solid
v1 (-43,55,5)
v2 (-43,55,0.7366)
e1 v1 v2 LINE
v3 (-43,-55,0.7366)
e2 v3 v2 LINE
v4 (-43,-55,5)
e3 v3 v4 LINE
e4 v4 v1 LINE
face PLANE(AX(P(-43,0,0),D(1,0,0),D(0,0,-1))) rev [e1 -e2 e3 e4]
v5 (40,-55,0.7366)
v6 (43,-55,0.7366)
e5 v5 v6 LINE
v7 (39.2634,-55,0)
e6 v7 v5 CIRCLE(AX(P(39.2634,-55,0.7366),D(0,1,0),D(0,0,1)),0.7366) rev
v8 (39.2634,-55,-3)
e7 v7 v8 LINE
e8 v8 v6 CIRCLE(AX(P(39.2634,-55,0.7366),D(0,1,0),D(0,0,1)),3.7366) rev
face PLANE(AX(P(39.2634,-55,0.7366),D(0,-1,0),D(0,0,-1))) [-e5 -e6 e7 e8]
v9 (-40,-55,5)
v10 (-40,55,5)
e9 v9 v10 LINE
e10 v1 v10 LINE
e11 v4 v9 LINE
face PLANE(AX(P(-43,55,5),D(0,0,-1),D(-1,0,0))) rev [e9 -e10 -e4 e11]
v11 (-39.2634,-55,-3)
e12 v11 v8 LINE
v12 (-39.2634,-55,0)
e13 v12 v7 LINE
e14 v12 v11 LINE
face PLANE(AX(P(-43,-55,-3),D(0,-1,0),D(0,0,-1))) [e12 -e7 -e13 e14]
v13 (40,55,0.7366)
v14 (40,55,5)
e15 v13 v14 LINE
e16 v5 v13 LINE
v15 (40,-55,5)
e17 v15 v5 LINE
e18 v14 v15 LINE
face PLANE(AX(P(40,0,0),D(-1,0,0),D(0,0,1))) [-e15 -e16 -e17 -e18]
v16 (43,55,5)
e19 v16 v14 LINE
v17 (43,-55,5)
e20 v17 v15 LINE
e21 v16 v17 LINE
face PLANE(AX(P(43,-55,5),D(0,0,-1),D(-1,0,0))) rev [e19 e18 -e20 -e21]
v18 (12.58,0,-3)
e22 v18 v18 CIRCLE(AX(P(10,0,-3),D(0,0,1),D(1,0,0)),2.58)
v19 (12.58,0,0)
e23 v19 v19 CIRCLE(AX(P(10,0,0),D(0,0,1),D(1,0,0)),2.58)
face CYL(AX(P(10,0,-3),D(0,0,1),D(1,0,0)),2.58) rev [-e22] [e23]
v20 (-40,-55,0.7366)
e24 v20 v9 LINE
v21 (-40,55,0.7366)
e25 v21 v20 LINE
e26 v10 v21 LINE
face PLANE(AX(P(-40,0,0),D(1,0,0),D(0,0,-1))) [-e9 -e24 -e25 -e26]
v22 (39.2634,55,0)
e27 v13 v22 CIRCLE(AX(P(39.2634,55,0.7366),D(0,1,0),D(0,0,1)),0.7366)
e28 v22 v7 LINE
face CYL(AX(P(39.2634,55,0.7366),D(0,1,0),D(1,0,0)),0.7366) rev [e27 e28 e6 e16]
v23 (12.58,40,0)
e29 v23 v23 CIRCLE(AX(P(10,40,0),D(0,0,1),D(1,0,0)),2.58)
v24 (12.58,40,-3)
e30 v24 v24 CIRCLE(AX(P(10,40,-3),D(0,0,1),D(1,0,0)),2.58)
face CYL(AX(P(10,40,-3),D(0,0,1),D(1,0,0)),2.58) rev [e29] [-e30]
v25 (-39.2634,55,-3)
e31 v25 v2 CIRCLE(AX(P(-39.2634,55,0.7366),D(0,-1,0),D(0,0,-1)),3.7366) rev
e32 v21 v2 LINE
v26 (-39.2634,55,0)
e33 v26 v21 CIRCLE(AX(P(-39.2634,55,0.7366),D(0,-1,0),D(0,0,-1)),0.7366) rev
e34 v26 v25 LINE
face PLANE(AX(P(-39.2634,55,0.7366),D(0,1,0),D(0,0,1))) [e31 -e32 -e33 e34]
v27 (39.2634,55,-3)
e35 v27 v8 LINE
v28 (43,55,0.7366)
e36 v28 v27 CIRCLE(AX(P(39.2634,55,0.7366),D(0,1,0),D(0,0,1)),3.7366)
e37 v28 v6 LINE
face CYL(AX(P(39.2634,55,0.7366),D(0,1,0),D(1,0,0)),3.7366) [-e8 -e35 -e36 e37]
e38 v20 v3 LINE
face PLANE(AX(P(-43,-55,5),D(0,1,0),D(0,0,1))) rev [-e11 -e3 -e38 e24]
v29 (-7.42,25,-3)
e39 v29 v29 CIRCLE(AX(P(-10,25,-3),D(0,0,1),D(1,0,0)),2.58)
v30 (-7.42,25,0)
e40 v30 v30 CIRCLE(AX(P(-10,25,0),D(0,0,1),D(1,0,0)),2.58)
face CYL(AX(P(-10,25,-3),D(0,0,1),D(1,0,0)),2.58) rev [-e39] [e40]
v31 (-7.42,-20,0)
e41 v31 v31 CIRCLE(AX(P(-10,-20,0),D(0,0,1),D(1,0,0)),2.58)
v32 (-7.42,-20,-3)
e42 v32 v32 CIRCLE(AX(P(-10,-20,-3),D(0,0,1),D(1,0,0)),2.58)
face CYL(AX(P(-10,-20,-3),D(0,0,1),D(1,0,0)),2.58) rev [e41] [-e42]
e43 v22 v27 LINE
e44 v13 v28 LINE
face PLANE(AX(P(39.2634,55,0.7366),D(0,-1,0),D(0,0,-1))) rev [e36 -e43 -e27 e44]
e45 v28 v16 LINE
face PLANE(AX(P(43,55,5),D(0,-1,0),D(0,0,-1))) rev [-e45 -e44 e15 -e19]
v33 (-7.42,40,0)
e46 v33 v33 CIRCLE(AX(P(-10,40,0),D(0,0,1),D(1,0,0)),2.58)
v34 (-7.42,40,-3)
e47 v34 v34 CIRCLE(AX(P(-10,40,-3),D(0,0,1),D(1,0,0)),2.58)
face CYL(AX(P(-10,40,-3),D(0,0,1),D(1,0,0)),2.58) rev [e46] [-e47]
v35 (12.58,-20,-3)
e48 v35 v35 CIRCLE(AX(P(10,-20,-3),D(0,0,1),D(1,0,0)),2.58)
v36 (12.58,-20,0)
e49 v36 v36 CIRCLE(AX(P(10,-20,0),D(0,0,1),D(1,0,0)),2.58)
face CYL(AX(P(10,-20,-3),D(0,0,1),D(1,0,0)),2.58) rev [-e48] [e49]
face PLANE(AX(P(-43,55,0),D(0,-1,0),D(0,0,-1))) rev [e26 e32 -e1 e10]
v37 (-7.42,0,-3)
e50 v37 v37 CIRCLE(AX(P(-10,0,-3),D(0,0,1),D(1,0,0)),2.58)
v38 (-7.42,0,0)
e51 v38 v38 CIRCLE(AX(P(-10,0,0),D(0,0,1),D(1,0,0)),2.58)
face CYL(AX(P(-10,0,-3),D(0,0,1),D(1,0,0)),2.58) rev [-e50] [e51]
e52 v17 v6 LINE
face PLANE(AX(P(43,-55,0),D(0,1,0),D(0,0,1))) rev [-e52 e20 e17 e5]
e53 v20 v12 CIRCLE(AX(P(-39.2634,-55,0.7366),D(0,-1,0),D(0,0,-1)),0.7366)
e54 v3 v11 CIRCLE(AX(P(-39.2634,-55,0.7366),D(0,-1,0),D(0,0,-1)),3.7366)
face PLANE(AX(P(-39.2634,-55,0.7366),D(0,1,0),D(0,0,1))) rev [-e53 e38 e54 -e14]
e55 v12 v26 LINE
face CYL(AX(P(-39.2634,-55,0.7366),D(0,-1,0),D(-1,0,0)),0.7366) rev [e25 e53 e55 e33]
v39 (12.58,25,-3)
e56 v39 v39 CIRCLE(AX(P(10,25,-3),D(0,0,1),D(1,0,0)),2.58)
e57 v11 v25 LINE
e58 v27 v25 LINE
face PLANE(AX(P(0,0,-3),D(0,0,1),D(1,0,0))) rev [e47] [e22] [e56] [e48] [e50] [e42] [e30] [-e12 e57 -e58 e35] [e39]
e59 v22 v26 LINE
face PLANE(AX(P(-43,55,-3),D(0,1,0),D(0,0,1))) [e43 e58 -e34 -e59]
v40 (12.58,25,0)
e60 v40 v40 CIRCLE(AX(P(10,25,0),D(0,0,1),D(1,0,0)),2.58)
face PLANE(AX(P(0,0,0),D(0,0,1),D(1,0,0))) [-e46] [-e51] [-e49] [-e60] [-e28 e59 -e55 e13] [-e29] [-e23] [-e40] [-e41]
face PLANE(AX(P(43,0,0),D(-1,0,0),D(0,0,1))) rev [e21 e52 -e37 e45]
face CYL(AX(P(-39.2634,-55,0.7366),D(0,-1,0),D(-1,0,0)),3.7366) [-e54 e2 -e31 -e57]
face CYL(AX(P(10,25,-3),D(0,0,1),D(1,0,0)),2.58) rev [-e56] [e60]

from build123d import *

# Parameters (mm, degrees)
SKETCH1_W                      = 86
SKETCH1_H                      = 110
BASE_FLANGE1_DEPTH             = 3
SKETCH6_R                      = 2.58
CUT_EXTRUDE1_DEPTH             = 3
EDGE_FLANGE1_STRIP_W           = 13.4732
EDGE_FLANGE1_STRIP_H           = 3
EDGE_FLANGE1_STRIP_CUT_DEPTH   = 110
EDGE_FLANGE1_STRIP_2_W         = 13.4732
EDGE_FLANGE1_STRIP_2_H         = 3
EDGE_FLANGE1_STRIP_CUT_2_DEPTH = 110
EDGE_FLANGE1_DEPTH             = 110
EDGE_FLANGE1_BEND_DEPTH        = 110


# Sheet-metal steps are written as plain solids
with BuildPart() as part:
    # Sketch1 → Base-Flange1 (new body)
    with BuildSketch(Plane.XY):
        Rectangle(SKETCH1_W, SKETCH1_H)
    extrude(amount=-BASE_FLANGE1_DEPTH)

    # Sketch6 → Cut-Extrude1 (cut)
    with BuildSketch(Plane.XY):
        with Locations((-10, 40)):
            Circle(SKETCH6_R)
        with Locations((10, 40)):
            Circle(SKETCH6_R)
        with Locations((-10, 25)):
            Circle(SKETCH6_R)
        with Locations((10, 25)):
            Circle(SKETCH6_R)
        with Locations((10, 0)):
            Circle(SKETCH6_R)
        with Locations((-10, 0)):
            Circle(SKETCH6_R)
        with Locations((-10, -20)):
            Circle(SKETCH6_R)
        with Locations((10, -20)):
            Circle(SKETCH6_R)
    extrude(amount=-CUT_EXTRUDE1_DEPTH, mode=Mode.SUBTRACT)

    # Edge-Flange1 strip (across the edge) → Edge-Flange1 strip cut (cut)
    with BuildSketch(Plane(origin=(-43, 55, 0), x_dir=(1, 0, 0), z_dir=(0, -1, 0))):
        with Locations((-3, -1.5)):
            Rectangle(EDGE_FLANGE1_STRIP_W, EDGE_FLANGE1_STRIP_H)
    extrude(amount=EDGE_FLANGE1_STRIP_CUT_DEPTH, mode=Mode.SUBTRACT)

    # Edge-Flange1 strip 2 (across the edge) → Edge-Flange1 strip cut 2 (cut)
    with BuildSketch(Plane(origin=(43, -55, 0), x_dir=(-1, 0, 0), z_dir=(0, 1, 0))):
        with Locations((-3, -1.5)):
            Rectangle(EDGE_FLANGE1_STRIP_2_W, EDGE_FLANGE1_STRIP_2_H)
    extrude(amount=EDGE_FLANGE1_STRIP_CUT_2_DEPTH, mode=Mode.SUBTRACT)

    # Edge-Flange1 section (across the edge) → Edge-Flange1 (add)
    with BuildSketch(Plane(origin=(-43, 55, 0), x_dir=(1, 0, 0), z_dir=(0, -1, 0))):
        with BuildLine():
            Line((0, 0.7366), (0, 5))
            Line((0, 5), (3, 5))
            Line((3, 5), (3, 0.7366))
            ThreePointArc((3, 0.7366), (3.215745145, 0.215745145), (3.7366, 0))
            Line((3.7366, 0), (3.7366, -3))
            ThreePointArc((3.7366, -3), (1.094424801, -1.905575199), (0, 0.7366))
        make_face()
    extrude(amount=EDGE_FLANGE1_DEPTH)

    # Edge-Flange1 section 2 (across the edge) → Edge-Flange1 bend (add)
    with BuildSketch(Plane(origin=(43, -55, 0), x_dir=(-1, 0, 0), z_dir=(0, 1, 0))):
        with BuildLine():
            Line((0, 0.7366), (0, 5))
            Line((0, 5), (3, 5))
            Line((3, 5), (3, 0.7366))
            ThreePointArc((3, 0.7366), (3.215745145, 0.215745145), (3.7366, 0))
            Line((3.7366, 0), (3.7366, -3))
            ThreePointArc((3.7366, -3), (1.094424801, -1.905575199), (0, 0.7366))
        make_face()
    extrude(amount=EDGE_FLANGE1_BEND_DEPTH)


solid = part.part
